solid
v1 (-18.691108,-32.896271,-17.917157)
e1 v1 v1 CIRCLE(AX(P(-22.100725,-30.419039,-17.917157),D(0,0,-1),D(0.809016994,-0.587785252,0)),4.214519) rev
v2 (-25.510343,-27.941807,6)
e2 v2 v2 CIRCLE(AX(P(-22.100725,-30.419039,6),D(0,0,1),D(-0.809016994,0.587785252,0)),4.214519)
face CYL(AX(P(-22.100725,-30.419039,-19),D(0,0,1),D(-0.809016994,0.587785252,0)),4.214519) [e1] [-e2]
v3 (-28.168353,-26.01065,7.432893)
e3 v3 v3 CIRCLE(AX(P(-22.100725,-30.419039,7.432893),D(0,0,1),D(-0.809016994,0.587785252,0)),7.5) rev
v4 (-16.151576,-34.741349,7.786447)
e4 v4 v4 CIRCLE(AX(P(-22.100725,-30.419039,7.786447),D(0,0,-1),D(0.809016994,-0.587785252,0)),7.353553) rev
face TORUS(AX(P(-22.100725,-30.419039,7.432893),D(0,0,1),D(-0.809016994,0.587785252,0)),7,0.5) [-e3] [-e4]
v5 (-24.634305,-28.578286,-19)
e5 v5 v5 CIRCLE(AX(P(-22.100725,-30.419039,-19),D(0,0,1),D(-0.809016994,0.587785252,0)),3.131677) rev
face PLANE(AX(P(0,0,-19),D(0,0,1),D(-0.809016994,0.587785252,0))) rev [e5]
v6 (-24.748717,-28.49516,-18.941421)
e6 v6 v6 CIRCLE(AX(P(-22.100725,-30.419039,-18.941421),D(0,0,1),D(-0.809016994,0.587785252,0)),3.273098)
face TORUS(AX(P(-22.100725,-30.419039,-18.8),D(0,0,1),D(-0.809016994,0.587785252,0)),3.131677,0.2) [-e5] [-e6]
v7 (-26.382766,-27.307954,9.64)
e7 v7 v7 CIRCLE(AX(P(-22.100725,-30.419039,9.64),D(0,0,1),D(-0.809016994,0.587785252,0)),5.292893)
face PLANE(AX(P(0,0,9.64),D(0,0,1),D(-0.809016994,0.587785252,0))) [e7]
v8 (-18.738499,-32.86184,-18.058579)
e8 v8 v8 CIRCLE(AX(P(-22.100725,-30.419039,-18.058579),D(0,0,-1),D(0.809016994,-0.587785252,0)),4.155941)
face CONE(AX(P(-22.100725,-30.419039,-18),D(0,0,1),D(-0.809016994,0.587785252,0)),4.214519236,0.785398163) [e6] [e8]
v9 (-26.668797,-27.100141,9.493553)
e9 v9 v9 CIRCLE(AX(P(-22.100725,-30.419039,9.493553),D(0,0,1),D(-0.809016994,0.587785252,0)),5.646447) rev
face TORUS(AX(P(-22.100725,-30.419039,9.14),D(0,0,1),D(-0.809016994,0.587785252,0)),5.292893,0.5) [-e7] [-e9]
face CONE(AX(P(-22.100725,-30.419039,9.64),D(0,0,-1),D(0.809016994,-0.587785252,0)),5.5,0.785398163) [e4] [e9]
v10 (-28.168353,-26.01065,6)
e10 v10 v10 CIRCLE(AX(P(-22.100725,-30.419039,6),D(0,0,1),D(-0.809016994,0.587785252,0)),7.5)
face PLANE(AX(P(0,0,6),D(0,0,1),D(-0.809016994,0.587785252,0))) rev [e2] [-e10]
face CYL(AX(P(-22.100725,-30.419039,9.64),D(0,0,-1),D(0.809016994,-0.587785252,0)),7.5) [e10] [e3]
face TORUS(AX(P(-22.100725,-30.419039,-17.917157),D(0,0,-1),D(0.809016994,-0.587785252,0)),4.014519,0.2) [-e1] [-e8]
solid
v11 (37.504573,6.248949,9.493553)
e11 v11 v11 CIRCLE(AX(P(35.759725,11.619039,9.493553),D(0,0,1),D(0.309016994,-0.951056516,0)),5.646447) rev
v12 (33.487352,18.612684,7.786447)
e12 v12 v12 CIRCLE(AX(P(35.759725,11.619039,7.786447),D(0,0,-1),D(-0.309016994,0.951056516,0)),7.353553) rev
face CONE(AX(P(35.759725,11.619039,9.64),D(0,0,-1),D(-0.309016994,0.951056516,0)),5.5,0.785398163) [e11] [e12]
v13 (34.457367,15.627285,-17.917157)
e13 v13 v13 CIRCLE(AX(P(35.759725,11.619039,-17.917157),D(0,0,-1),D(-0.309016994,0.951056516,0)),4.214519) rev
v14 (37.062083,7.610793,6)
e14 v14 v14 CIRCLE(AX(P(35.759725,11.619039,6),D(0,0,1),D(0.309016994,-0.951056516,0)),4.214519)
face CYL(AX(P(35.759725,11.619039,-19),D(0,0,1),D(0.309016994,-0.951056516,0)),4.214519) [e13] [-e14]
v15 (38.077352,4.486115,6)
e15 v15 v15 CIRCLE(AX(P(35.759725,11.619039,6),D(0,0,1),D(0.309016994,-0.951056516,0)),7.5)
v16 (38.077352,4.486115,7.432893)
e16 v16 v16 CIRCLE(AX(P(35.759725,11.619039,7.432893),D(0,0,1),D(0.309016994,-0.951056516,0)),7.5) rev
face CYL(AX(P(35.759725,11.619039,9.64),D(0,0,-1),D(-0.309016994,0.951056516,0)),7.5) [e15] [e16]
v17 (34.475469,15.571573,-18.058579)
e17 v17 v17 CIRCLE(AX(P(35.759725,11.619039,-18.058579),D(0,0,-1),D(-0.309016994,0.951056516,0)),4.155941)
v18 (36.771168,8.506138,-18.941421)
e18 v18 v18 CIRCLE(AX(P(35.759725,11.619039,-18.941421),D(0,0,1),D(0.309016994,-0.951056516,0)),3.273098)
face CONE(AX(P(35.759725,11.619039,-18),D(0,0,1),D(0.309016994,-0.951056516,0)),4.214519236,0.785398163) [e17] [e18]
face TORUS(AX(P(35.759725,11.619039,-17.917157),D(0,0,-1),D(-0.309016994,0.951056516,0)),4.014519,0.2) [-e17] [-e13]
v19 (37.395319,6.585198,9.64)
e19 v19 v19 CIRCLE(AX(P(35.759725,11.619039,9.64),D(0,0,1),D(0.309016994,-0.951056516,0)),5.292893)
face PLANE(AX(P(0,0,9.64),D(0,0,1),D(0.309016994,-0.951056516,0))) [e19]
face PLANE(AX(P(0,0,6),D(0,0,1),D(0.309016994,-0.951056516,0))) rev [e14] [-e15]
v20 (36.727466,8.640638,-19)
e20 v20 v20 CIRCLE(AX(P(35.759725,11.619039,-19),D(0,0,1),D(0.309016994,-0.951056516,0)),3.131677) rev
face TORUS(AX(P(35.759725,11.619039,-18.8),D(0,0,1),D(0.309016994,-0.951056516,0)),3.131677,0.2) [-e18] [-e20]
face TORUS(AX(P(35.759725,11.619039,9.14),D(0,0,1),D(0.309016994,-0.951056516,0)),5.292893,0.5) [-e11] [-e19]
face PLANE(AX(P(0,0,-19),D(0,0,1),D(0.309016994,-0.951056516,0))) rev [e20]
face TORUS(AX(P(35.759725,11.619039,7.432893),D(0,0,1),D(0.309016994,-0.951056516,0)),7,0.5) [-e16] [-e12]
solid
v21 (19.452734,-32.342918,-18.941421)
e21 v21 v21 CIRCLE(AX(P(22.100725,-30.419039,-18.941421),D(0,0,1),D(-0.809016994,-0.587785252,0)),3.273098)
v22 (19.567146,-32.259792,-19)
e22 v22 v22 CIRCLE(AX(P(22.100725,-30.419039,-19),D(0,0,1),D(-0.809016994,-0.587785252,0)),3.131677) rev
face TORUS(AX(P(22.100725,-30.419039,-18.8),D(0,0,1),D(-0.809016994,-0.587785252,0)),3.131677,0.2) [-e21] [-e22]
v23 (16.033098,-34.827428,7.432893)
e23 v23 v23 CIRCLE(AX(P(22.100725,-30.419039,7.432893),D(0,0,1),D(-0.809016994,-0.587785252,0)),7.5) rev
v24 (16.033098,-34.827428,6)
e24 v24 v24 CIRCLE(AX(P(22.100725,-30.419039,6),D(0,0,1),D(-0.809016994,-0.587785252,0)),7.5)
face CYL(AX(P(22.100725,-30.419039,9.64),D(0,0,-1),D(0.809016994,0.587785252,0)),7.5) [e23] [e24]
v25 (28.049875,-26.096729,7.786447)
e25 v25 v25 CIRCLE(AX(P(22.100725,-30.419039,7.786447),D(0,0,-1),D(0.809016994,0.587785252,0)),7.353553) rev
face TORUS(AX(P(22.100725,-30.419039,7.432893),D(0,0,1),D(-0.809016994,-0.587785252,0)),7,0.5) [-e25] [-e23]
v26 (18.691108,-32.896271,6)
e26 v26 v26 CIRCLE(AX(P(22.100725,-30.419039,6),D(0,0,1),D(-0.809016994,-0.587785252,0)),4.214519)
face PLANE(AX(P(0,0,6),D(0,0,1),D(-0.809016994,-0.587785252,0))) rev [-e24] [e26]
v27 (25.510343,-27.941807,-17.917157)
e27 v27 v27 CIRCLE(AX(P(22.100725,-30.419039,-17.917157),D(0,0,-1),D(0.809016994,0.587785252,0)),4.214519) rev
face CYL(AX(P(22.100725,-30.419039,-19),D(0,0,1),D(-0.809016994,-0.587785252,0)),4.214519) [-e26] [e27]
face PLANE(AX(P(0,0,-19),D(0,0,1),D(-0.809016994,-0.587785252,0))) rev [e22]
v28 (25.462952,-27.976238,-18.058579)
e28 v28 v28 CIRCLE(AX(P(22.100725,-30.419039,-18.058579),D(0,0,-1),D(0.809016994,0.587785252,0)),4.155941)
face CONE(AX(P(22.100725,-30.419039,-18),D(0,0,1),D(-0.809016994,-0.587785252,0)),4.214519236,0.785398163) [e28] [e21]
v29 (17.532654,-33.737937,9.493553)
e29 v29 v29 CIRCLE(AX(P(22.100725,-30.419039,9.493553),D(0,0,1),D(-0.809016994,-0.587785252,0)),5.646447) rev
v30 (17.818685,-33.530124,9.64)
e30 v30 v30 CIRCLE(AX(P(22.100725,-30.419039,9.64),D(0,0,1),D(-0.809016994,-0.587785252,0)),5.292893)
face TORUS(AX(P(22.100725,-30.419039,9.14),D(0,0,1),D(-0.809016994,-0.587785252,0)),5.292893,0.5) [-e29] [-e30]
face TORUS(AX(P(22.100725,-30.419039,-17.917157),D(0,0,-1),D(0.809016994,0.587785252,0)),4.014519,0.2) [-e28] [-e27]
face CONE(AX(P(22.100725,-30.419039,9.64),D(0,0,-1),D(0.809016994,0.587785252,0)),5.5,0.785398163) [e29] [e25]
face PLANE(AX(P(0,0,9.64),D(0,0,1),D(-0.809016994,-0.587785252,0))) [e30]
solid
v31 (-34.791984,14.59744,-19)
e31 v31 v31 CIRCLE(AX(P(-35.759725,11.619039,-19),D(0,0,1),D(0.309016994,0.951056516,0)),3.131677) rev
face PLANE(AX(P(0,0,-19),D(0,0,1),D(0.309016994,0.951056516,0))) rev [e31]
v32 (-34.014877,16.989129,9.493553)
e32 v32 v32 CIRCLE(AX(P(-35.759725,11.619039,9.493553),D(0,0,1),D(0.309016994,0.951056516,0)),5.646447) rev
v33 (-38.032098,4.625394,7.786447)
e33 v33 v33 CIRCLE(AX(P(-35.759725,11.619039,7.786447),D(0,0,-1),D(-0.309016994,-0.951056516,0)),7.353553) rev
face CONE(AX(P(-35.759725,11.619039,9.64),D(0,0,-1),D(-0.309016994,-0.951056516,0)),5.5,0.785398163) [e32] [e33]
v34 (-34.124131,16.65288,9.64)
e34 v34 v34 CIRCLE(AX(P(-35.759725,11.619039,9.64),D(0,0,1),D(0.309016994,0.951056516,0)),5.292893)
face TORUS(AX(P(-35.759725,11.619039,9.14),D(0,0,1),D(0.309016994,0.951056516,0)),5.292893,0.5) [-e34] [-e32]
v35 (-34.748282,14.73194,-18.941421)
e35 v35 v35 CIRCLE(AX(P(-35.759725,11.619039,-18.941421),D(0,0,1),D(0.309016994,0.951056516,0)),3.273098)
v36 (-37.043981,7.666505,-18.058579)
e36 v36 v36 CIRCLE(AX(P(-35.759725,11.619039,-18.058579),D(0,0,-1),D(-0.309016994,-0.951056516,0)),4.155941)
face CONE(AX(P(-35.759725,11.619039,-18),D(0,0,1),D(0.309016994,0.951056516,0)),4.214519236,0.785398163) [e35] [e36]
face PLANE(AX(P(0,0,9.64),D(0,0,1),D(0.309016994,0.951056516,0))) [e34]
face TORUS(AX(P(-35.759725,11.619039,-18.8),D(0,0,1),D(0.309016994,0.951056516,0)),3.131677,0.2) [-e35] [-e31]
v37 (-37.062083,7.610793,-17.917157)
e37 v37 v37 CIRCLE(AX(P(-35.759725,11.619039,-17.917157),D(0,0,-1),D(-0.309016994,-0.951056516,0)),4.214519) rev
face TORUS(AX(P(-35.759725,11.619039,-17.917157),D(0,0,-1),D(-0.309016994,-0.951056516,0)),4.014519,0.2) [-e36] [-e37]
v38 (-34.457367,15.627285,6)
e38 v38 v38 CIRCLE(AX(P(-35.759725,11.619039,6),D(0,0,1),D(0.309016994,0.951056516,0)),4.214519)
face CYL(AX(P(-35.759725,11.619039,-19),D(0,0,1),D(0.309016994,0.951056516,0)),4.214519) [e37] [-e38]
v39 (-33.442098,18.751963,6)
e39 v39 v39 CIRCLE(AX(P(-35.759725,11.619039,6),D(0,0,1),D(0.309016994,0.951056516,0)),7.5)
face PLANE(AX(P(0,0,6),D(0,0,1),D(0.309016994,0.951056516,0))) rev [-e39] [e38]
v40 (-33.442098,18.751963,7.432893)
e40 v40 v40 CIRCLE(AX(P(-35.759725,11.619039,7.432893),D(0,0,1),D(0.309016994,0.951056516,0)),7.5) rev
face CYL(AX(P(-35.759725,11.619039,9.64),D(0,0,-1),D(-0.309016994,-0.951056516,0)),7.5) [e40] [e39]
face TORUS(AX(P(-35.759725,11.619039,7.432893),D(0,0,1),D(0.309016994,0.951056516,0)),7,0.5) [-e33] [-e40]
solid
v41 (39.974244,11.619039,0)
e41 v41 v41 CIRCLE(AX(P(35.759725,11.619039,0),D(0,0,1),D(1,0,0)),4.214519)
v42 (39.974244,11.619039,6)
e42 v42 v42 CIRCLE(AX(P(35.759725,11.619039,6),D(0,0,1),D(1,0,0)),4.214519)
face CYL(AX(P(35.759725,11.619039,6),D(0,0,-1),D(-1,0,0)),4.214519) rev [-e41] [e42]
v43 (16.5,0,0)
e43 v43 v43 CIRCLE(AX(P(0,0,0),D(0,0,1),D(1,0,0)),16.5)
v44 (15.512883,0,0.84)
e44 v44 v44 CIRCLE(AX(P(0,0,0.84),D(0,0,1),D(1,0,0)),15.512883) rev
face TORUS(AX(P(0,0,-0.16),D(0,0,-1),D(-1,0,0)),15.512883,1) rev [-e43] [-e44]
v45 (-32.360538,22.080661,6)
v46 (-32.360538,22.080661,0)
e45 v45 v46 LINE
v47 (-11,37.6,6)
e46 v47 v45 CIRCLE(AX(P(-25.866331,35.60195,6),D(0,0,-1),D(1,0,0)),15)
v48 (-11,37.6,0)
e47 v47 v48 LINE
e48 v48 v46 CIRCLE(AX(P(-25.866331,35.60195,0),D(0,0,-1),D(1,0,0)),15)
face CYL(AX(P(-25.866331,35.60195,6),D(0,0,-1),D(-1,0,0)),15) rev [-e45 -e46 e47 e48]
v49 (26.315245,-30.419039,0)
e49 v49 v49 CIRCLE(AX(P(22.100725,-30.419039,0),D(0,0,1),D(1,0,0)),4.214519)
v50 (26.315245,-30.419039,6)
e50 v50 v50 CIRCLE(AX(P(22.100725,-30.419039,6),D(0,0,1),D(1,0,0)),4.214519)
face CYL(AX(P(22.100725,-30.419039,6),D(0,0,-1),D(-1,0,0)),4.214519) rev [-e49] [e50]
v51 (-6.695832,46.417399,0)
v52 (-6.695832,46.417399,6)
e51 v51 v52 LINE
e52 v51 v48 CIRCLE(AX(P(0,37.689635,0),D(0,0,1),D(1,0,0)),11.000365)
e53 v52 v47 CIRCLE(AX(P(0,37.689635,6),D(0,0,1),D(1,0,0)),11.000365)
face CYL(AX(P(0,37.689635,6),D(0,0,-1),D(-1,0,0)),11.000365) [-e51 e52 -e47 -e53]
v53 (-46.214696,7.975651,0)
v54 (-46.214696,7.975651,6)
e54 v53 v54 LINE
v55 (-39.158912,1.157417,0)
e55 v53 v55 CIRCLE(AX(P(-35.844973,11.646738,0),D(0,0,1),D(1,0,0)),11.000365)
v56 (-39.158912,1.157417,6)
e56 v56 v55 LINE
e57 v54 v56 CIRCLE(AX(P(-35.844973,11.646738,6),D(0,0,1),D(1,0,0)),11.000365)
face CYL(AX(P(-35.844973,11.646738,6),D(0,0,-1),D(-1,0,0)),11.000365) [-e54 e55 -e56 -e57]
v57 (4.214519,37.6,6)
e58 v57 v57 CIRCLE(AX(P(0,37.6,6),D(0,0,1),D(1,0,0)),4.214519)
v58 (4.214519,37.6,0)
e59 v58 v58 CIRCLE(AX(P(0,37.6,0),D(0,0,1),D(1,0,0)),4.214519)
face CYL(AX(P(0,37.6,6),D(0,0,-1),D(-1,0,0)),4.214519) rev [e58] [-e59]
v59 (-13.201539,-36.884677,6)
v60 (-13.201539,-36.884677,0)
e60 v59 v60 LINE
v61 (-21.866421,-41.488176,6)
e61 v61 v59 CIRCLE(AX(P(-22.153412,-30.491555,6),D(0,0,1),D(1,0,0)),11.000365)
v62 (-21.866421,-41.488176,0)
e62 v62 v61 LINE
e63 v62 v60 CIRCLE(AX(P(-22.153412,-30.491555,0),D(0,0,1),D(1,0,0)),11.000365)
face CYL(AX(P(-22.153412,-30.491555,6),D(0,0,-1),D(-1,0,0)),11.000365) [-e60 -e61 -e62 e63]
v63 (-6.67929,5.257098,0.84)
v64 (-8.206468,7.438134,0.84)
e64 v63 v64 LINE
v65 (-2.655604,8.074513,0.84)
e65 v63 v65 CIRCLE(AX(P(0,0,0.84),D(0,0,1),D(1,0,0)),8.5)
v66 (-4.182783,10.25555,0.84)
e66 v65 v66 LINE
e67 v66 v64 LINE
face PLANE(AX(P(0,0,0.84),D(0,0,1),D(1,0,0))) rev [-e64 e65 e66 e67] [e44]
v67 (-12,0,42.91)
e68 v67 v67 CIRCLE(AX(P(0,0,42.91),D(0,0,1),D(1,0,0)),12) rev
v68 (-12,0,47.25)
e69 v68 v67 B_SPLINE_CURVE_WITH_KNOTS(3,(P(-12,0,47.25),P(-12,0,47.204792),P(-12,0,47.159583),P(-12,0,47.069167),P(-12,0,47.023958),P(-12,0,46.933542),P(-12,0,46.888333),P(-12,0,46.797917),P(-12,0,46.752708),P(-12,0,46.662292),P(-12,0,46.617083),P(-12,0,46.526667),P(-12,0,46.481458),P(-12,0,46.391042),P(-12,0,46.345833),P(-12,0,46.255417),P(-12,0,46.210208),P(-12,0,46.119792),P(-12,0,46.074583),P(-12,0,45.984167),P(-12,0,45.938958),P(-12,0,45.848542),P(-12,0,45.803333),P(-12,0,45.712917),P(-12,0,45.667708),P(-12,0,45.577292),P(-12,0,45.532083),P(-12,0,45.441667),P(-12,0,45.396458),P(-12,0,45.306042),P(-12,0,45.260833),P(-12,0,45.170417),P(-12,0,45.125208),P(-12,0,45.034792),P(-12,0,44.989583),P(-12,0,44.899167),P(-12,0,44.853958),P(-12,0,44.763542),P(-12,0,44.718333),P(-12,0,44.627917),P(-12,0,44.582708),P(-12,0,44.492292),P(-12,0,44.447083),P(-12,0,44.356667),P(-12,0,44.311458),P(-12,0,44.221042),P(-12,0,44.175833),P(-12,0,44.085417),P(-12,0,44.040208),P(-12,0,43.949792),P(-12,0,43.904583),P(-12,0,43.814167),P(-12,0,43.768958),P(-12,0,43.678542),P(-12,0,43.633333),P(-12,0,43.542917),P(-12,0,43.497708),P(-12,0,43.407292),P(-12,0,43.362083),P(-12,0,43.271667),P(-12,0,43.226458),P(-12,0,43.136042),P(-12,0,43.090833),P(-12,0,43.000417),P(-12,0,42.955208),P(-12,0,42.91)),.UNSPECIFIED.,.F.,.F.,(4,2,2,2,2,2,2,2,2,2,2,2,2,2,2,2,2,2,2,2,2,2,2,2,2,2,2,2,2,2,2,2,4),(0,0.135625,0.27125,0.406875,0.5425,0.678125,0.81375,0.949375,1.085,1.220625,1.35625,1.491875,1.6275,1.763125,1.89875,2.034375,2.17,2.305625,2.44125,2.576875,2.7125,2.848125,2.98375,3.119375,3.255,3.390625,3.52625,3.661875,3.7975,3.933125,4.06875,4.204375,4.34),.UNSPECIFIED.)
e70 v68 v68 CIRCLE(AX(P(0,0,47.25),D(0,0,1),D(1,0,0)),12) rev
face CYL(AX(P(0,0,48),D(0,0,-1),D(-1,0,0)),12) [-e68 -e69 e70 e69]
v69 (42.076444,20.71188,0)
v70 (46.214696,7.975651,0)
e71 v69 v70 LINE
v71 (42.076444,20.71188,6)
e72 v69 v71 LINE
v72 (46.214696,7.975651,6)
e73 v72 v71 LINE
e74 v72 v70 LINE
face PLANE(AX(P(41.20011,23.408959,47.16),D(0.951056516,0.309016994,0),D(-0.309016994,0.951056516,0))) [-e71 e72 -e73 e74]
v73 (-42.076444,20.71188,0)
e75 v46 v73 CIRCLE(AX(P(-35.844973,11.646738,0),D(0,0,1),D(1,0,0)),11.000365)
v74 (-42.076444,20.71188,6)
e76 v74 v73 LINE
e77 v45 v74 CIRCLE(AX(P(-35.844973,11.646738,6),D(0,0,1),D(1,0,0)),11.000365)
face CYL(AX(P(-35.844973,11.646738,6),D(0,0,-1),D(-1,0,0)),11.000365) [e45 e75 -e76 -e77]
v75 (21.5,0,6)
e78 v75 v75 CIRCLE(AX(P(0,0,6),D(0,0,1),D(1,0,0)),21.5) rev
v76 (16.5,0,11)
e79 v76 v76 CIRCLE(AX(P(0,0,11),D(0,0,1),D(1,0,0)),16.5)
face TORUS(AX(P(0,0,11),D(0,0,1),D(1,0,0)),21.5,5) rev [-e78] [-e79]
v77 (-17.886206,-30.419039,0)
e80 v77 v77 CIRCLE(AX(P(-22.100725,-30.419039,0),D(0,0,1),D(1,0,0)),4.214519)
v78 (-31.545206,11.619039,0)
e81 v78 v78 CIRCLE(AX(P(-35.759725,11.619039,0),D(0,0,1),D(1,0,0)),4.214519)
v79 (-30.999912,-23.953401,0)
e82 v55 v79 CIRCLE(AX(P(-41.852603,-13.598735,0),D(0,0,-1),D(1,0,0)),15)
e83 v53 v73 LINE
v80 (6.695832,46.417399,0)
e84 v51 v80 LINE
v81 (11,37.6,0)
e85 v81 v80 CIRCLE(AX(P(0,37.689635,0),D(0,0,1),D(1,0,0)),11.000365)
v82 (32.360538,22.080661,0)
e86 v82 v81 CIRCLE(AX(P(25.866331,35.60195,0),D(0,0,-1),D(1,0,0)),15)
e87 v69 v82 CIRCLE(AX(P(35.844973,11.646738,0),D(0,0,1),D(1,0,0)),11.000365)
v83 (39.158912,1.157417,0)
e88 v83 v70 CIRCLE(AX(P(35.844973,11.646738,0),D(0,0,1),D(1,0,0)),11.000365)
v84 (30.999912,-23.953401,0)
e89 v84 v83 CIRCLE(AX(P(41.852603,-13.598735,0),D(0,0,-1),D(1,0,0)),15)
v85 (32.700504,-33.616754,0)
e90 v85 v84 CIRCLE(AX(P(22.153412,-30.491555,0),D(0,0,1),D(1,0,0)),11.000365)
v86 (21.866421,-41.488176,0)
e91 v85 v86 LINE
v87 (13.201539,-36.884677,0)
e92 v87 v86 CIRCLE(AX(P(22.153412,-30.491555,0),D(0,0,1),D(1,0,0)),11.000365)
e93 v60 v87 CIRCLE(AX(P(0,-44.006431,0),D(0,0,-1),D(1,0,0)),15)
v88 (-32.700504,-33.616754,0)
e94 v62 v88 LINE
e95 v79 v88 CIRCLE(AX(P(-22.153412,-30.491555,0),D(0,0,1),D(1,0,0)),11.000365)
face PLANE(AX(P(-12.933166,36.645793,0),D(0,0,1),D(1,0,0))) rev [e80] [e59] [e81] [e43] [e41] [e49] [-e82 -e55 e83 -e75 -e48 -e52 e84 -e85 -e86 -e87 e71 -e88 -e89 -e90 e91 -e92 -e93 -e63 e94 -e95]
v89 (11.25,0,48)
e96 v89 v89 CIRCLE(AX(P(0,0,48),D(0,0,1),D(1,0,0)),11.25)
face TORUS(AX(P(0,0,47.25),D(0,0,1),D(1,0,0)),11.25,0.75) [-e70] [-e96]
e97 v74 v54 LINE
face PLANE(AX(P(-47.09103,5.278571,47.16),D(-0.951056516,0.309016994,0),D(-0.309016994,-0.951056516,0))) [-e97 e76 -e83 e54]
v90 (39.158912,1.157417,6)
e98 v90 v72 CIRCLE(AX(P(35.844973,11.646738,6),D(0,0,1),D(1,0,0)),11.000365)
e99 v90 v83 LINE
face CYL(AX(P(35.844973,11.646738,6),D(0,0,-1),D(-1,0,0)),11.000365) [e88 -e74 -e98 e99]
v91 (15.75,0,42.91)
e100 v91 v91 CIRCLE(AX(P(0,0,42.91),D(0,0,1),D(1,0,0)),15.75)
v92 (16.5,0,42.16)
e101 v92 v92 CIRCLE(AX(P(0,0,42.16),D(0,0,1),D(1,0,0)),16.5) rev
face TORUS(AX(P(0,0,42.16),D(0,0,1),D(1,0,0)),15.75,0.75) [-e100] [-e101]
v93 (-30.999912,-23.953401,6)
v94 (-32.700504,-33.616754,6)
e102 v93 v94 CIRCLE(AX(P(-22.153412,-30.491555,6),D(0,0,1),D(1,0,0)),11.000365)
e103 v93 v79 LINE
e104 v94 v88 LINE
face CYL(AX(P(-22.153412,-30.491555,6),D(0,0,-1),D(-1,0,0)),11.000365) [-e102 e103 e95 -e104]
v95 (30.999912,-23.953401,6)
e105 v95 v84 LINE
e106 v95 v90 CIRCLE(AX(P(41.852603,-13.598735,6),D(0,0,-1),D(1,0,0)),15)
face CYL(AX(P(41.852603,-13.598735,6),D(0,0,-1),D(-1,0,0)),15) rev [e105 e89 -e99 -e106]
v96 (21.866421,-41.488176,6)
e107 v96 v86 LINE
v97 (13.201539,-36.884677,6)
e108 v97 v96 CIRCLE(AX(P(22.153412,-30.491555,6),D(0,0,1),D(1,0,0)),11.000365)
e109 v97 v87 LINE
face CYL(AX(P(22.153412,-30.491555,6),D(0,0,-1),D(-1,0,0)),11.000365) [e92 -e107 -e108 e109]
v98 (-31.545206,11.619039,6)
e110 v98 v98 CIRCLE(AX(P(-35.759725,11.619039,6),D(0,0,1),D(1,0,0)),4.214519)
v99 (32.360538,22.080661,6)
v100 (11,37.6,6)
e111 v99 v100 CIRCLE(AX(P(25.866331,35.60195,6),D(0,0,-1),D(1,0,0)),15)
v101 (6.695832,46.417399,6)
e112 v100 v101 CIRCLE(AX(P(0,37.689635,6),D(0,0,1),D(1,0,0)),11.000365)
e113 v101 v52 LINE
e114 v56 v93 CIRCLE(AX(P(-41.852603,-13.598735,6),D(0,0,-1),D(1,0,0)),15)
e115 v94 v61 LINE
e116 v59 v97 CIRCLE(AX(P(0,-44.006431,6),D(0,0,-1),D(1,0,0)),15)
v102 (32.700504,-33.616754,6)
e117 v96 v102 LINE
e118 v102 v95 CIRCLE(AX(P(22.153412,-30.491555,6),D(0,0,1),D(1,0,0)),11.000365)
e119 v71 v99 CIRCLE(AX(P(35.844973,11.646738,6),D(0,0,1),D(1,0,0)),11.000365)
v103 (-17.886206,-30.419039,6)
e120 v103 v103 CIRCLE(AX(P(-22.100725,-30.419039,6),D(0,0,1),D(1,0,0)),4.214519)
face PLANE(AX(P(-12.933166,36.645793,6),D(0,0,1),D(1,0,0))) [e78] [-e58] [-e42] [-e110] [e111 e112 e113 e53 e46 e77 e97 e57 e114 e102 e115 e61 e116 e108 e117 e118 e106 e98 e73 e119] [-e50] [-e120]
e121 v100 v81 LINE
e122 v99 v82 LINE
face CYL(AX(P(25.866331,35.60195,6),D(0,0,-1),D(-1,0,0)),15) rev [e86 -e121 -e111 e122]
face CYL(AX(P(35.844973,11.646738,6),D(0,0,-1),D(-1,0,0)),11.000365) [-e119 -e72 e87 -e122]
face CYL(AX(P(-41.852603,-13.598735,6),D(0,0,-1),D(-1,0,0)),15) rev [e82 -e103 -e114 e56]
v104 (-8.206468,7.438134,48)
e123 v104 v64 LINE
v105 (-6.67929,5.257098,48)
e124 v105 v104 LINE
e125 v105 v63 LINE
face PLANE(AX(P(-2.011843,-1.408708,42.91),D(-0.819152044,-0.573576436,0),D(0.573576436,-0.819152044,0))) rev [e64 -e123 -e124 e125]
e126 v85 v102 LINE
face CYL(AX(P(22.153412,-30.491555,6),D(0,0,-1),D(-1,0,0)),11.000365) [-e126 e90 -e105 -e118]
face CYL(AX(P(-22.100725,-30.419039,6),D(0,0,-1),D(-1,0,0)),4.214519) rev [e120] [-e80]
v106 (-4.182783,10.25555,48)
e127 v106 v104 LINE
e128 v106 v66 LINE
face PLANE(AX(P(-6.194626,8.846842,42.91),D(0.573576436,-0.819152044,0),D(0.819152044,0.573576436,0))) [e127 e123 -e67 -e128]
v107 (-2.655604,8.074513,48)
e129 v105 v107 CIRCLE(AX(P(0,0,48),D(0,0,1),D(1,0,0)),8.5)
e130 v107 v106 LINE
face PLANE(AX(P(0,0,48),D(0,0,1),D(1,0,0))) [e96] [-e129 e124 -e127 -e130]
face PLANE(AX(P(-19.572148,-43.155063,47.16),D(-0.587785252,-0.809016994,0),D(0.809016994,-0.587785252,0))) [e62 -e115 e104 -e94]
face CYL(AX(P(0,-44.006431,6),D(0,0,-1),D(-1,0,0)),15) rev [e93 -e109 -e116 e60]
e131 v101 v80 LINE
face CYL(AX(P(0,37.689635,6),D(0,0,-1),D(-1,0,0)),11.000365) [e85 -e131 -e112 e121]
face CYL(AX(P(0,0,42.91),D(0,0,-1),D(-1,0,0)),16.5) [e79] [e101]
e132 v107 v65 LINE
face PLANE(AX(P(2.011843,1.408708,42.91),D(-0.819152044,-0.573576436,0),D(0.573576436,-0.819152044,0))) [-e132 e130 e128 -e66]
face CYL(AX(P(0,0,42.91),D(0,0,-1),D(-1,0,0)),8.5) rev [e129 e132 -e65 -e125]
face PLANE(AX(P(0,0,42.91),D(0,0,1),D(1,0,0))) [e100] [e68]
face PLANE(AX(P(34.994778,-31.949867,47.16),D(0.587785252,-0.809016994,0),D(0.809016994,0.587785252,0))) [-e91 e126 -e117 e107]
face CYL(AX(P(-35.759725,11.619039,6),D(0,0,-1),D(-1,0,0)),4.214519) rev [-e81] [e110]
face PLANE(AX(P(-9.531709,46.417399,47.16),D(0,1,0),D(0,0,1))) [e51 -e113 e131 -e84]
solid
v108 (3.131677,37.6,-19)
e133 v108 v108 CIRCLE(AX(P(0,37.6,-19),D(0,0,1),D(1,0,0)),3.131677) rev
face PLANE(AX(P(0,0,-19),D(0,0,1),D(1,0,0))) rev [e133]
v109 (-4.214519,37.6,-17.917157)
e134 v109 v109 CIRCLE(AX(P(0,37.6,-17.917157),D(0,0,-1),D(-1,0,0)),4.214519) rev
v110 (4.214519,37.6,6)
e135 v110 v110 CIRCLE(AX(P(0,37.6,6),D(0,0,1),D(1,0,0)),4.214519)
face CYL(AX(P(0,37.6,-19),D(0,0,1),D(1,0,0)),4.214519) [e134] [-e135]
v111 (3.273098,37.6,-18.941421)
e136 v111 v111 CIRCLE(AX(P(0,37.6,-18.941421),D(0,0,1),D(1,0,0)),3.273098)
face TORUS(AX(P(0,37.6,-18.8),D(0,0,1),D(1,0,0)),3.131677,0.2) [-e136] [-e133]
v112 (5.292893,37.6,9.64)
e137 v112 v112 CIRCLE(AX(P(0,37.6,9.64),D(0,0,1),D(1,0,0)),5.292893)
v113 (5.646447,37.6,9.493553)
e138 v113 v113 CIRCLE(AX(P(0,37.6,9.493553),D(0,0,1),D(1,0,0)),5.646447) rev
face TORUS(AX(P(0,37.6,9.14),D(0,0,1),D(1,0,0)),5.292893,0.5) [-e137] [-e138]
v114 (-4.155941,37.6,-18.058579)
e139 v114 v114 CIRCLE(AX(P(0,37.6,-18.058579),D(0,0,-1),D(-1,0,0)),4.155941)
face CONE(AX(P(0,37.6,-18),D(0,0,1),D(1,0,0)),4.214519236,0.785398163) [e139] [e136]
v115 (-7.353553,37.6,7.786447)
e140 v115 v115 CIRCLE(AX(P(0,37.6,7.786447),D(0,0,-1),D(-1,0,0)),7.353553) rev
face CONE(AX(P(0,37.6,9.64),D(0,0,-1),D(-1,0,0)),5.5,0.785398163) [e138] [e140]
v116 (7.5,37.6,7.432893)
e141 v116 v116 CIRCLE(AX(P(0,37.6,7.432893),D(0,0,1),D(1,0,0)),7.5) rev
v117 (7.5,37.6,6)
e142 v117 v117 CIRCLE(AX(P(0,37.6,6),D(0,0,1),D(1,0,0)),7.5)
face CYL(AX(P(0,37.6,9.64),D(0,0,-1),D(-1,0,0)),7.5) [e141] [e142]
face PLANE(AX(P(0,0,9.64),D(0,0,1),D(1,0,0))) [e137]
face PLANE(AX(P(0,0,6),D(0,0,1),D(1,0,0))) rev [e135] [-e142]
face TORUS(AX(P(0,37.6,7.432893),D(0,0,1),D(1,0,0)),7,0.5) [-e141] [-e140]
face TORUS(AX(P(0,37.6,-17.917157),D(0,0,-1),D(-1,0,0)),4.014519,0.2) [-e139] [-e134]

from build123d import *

# Parameters (mm, degrees)
SKETCH2_R           = 16.5
SKETCH2_R_2         = 4.214519236
BOSS_EXTRUDE1_DEPTH = 6
SKETCH3_R           = 16.5
SKETCH3_R_2         = 12
BOSS_EXTRUDE3_DEPTH = 42.07
SKETCH3_4_R         = 12
BOSS_EXTRUDE4_DEPTH = 47.16
FILLET1_R           = 5
FILLET2_R           = 0.75
SKETCH4_W           = 19.06341868
SKETCH4_H           = 5.165201456
CUT_EXTRUDE1_DEPTH  = 47.16
FILLET3_R           = 0.75
FILLET4_R           = 1
SKETCH5_R           = 7.5
SKETCH5_R_2         = 4.214519236
BOSS_EXTRUDE5_DEPTH = 3.64
BOSS_EXTRUDE6_START = -25
SKETCH5_3_R         = 4.214519236
BOSS_EXTRUDE6_DEPTH = 25
CHAMFER1_SIZE       = 1
FILLET6_R           = 0.2
CHAMFER2_SIZE       = 2
FILLET7_R           = 0.5
FILLET8_R           = 0.5
CIRPATTERN1_COUNT   = 5


with BuildPart() as part:
    # Sketch2 → Boss-Extrude1 (new body)
    with BuildSketch(Plane.XY):
        with BuildLine():
            ThreePointArc((11, 37.6), (17.049552222, 23.46669543), (32.360538075, 22.080660668))
            ThreePointArc((32.360538075, 22.080660668), (46.306941778, 15.046037456), (39.158911951, 1.157417309))
            ThreePointArc((39.158911951, 1.157417309), (27.586754987, -8.963480051), (30.999912424, -23.953401213))
            ThreePointArc((30.999912424, -23.953401213), (28.619263934, -39.391037456), (13.201538548, -36.884676764))
            ThreePointArc((13.201538548, -36.884676764), (0, -29.006430759), (-13.201538548, -36.884676764))
            ThreePointArc((-13.201538548, -36.884676764), (-28.619263934, -39.391037456), (-30.999912424, -23.953401213))
            ThreePointArc((-30.999912424, -23.953401213), (-27.586754987, -8.963480051), (-39.158911951, 1.157417309))
            ThreePointArc((-39.158911951, 1.157417309), (-46.306941778, 15.046037456), (-32.360538075, 22.080660668))
            ThreePointArc((-32.360538075, 22.080660668), (-17.049552222, 23.46669543), (-11, 37.6))
            ThreePointArc((-11, 37.6), (0, 48.69), (11, 37.6))
        make_face()
        Circle(SKETCH2_R, mode=Mode.SUBTRACT)
        with Locations((0, 37.6)):
            Circle(SKETCH2_R_2, mode=Mode.SUBTRACT)
        with Locations((35.759725013, 11.619038988)):
            Circle(SKETCH2_R_2, mode=Mode.SUBTRACT)
        with Locations((22.100725486, -30.419038988)):
            Circle(SKETCH2_R_2, mode=Mode.SUBTRACT)
        with Locations((-22.100725486, -30.419038988)):
            Circle(SKETCH2_R_2, mode=Mode.SUBTRACT)
        with Locations((-35.759725013, 11.619038988)):
            Circle(SKETCH2_R_2, mode=Mode.SUBTRACT)
    extrude(amount=BOSS_EXTRUDE1_DEPTH)

    # Sketch3 → Boss-Extrude3 (add)
    # profile 1 of 2: a face of its own
    with BuildSketch(Plane.XY.offset(0.84)):
        Circle(SKETCH3_R)
        Circle(SKETCH3_R_2, mode=Mode.SUBTRACT)
    # profile 2 of 2: a face of its own
    with BuildSketch(Plane.XY.offset(0.84)):
        Circle(SKETCH3_R_2)
        with BuildLine():
            ThreePointArc((-6.679290329, 5.257098125), (4.875399709, -6.962792376), (-2.65560448, 8.074513289))
            Line((-2.65560448, 8.074513289), (-4.182782588, 10.25554966))
            Line((-4.182782588, 10.25554966), (-8.206468437, 7.438134497))
            Line((-8.206468437, 7.438134497), (-6.679290329, 5.257098125))
        make_face(mode=Mode.SUBTRACT)
    extrude(amount=BOSS_EXTRUDE3_DEPTH)

    # Sketch3<4> → Boss-Extrude4 (add)
    with BuildSketch(Plane.XY.offset(0.84)):
        with Locations(Location((0, 0, 0), (0, 0, 180))):
            Circle(SKETCH3_4_R)
        with BuildLine():
            ThreePointArc((-6.679290329, 5.257098125), (4.875399709, -6.962792376), (-2.65560448, 8.074513289))
            Line((-2.65560448, 8.074513289), (-4.182782588, 10.25554966))
            Line((-4.182782588, 10.25554966), (-8.206468437, 7.438134497))
            Line((-8.206468437, 7.438134497), (-6.679290329, 5.257098125))
        make_face(mode=Mode.SUBTRACT)
    extrude(amount=BOSS_EXTRUDE4_DEPTH)

    # Fillet1
    fillet1_edges = [part.edges().sort_by_distance(p)[0] for p in [
        (-16.5, 0, 6),
    ]]
    fillet(fillet1_edges, radius=FILLET1_R)

    # Fillet2
    fillet2_edges = [part.edges().sort_by_distance(p)[0] for p in [
        (-16.5, 0, 42.91),
    ]]
    fillet(fillet2_edges, radius=FILLET2_R)

    # Sketch4 → Cut-Extrude1 (cut)
    with BuildSketch(Plane.XY):
        Polygon((46.112508378, 25.005094519), (52.003428721, 6.874705959), (47.091030219, 5.27857093), (41.200109876, 23.408959489), align=None)
        with Locations((0, 49)):
            Rectangle(SKETCH4_W, SKETCH4_H)
        Polygon((38.030806824, -36.128602423), (22.608177141, -47.333798782), (19.5721479, -43.155063025), (34.994777584, -31.949866667), align=None)
        Polygon((-22.608177141, -47.333798782), (-38.030806824, -36.128602423), (-34.994777584, -31.949866667), (-19.5721479, -43.155063025), align=None)
        Polygon((-52.003428721, 6.874705959), (-46.112508378, 25.005094519), (-41.200109876, 23.408959489), (-47.091030219, 5.27857093), align=None)
    extrude(amount=CUT_EXTRUDE1_DEPTH, mode=Mode.SUBTRACT)

    # Fillet3
    fillet3_edges = [part.edges().sort_by_distance(p)[0] for p in [
        (12, 0, 48),
    ]]
    fillet(fillet3_edges, radius=FILLET3_R)

    # Fillet4
    # the kernel refuses this fillet: 1 mm, written as the material it adds along each edge
    with BuildSketch(Plane(origin=(0, 0, 0.84), x_dir=(1, 0, 0), z_dir=(0, -1, 0))) as fillet4_piece_1:
        with BuildLine():
            CenterArc((15.512882986, -1), FILLET4_R, 9.206896221, 80.793103779)
            Line((16.5, -0.84), (16.51974234, -0.8368))
            ThreePointArc((16.51974234, -0.8368), (16.52, -0.42), (16.52, 0))
            Line((16.52, 0), (16.5, 0.02))
            Line((16.5, 0.02), (15.512882986, 0.02))
            Line((15.512882986, 0.02), (15.512882986, 0))
        make_face()
    revolve(axis=Axis((0, 0, 0.84), (0, 0, 1)))


with BuildPart() as body_2:
    # Sketch5 → Boss-Extrude5 (new body)
    # profile 1 of 2: a face of its own
    with BuildSketch(Plane.XY.offset(6)):
        with Locations((0, 37.6)):
            Circle(SKETCH5_R)
        with Locations((0, 37.6)):
            Circle(SKETCH5_R_2, mode=Mode.SUBTRACT)
    # profile 2 of 2: a face of its own
    with BuildSketch(Plane.XY.offset(6)):
        with Locations((0, 37.6)):
            Circle(SKETCH5_R_2)
    extrude(amount=BOSS_EXTRUDE5_DEPTH)

    # Sketch5<3> → Boss-Extrude6 (add)
    with BuildSketch(Plane.XY.offset(6).offset(BOSS_EXTRUDE6_START)):
        with Locations((0, 37.6)):
            Circle(SKETCH5_3_R)
    extrude(amount=BOSS_EXTRUDE6_DEPTH)

    # Chamfer1
    chamfer1_edges = [body_2.edges().sort_by_distance(p)[0] for p in [
        (-4.214519236, 37.6, -19),
    ]]
    chamfer(chamfer1_edges, length=CHAMFER1_SIZE)

    # Fillet6
    fillet6_edges = [body_2.edges().sort_by_distance(p)[0] for p in [
        (-4.214519236, 37.6, -18),
        (-3.214519236, 37.6, -19),
    ]]
    fillet(fillet6_edges, radius=FILLET6_R)

    # Chamfer2
    chamfer2_edges = [body_2.edges().sort_by_distance(p)[0] for p in [
        (-7.5, 37.6, 9.64),
    ]]
    chamfer(chamfer2_edges, length=CHAMFER2_SIZE)

    # Fillet7
    fillet7_edges = [body_2.edges().sort_by_distance(p)[0] for p in [
        (-7.5, 37.6, 7.64),
    ]]
    fillet(fillet7_edges, radius=FILLET7_R)

    # Fillet8
    fillet8_edges = [body_2.edges().sort_by_distance(p)[0] for p in [
        (-5.5, 37.6, 9.64),
    ]]
    fillet(fillet8_edges, radius=FILLET8_R)


with BuildPart() as cirpattern1_1:
    # CirPattern1: pattern copy
    add(body_2.part.rotate(Axis((0, 0, 0), (0, 0, 1)), 1 * 360 / CIRPATTERN1_COUNT))


with BuildPart() as cirpattern1_2:
    # CirPattern1: pattern copy
    add(body_2.part.rotate(Axis((0, 0, 0), (0, 0, 1)), 2 * 360 / CIRPATTERN1_COUNT))


with BuildPart() as cirpattern1_3:
    # CirPattern1: pattern copy
    add(body_2.part.rotate(Axis((0, 0, 0), (0, 0, 1)), 3 * 360 / CIRPATTERN1_COUNT))


with BuildPart() as cirpattern1_4:
    # CirPattern1: pattern copy
    add(body_2.part.rotate(Axis((0, 0, 0), (0, 0, 1)), 4 * 360 / CIRPATTERN1_COUNT))


solid = Compound([part.part, body_2.part, cirpattern1_1.part, cirpattern1_2.part, cirpattern1_3.part, cirpattern1_4.part])
